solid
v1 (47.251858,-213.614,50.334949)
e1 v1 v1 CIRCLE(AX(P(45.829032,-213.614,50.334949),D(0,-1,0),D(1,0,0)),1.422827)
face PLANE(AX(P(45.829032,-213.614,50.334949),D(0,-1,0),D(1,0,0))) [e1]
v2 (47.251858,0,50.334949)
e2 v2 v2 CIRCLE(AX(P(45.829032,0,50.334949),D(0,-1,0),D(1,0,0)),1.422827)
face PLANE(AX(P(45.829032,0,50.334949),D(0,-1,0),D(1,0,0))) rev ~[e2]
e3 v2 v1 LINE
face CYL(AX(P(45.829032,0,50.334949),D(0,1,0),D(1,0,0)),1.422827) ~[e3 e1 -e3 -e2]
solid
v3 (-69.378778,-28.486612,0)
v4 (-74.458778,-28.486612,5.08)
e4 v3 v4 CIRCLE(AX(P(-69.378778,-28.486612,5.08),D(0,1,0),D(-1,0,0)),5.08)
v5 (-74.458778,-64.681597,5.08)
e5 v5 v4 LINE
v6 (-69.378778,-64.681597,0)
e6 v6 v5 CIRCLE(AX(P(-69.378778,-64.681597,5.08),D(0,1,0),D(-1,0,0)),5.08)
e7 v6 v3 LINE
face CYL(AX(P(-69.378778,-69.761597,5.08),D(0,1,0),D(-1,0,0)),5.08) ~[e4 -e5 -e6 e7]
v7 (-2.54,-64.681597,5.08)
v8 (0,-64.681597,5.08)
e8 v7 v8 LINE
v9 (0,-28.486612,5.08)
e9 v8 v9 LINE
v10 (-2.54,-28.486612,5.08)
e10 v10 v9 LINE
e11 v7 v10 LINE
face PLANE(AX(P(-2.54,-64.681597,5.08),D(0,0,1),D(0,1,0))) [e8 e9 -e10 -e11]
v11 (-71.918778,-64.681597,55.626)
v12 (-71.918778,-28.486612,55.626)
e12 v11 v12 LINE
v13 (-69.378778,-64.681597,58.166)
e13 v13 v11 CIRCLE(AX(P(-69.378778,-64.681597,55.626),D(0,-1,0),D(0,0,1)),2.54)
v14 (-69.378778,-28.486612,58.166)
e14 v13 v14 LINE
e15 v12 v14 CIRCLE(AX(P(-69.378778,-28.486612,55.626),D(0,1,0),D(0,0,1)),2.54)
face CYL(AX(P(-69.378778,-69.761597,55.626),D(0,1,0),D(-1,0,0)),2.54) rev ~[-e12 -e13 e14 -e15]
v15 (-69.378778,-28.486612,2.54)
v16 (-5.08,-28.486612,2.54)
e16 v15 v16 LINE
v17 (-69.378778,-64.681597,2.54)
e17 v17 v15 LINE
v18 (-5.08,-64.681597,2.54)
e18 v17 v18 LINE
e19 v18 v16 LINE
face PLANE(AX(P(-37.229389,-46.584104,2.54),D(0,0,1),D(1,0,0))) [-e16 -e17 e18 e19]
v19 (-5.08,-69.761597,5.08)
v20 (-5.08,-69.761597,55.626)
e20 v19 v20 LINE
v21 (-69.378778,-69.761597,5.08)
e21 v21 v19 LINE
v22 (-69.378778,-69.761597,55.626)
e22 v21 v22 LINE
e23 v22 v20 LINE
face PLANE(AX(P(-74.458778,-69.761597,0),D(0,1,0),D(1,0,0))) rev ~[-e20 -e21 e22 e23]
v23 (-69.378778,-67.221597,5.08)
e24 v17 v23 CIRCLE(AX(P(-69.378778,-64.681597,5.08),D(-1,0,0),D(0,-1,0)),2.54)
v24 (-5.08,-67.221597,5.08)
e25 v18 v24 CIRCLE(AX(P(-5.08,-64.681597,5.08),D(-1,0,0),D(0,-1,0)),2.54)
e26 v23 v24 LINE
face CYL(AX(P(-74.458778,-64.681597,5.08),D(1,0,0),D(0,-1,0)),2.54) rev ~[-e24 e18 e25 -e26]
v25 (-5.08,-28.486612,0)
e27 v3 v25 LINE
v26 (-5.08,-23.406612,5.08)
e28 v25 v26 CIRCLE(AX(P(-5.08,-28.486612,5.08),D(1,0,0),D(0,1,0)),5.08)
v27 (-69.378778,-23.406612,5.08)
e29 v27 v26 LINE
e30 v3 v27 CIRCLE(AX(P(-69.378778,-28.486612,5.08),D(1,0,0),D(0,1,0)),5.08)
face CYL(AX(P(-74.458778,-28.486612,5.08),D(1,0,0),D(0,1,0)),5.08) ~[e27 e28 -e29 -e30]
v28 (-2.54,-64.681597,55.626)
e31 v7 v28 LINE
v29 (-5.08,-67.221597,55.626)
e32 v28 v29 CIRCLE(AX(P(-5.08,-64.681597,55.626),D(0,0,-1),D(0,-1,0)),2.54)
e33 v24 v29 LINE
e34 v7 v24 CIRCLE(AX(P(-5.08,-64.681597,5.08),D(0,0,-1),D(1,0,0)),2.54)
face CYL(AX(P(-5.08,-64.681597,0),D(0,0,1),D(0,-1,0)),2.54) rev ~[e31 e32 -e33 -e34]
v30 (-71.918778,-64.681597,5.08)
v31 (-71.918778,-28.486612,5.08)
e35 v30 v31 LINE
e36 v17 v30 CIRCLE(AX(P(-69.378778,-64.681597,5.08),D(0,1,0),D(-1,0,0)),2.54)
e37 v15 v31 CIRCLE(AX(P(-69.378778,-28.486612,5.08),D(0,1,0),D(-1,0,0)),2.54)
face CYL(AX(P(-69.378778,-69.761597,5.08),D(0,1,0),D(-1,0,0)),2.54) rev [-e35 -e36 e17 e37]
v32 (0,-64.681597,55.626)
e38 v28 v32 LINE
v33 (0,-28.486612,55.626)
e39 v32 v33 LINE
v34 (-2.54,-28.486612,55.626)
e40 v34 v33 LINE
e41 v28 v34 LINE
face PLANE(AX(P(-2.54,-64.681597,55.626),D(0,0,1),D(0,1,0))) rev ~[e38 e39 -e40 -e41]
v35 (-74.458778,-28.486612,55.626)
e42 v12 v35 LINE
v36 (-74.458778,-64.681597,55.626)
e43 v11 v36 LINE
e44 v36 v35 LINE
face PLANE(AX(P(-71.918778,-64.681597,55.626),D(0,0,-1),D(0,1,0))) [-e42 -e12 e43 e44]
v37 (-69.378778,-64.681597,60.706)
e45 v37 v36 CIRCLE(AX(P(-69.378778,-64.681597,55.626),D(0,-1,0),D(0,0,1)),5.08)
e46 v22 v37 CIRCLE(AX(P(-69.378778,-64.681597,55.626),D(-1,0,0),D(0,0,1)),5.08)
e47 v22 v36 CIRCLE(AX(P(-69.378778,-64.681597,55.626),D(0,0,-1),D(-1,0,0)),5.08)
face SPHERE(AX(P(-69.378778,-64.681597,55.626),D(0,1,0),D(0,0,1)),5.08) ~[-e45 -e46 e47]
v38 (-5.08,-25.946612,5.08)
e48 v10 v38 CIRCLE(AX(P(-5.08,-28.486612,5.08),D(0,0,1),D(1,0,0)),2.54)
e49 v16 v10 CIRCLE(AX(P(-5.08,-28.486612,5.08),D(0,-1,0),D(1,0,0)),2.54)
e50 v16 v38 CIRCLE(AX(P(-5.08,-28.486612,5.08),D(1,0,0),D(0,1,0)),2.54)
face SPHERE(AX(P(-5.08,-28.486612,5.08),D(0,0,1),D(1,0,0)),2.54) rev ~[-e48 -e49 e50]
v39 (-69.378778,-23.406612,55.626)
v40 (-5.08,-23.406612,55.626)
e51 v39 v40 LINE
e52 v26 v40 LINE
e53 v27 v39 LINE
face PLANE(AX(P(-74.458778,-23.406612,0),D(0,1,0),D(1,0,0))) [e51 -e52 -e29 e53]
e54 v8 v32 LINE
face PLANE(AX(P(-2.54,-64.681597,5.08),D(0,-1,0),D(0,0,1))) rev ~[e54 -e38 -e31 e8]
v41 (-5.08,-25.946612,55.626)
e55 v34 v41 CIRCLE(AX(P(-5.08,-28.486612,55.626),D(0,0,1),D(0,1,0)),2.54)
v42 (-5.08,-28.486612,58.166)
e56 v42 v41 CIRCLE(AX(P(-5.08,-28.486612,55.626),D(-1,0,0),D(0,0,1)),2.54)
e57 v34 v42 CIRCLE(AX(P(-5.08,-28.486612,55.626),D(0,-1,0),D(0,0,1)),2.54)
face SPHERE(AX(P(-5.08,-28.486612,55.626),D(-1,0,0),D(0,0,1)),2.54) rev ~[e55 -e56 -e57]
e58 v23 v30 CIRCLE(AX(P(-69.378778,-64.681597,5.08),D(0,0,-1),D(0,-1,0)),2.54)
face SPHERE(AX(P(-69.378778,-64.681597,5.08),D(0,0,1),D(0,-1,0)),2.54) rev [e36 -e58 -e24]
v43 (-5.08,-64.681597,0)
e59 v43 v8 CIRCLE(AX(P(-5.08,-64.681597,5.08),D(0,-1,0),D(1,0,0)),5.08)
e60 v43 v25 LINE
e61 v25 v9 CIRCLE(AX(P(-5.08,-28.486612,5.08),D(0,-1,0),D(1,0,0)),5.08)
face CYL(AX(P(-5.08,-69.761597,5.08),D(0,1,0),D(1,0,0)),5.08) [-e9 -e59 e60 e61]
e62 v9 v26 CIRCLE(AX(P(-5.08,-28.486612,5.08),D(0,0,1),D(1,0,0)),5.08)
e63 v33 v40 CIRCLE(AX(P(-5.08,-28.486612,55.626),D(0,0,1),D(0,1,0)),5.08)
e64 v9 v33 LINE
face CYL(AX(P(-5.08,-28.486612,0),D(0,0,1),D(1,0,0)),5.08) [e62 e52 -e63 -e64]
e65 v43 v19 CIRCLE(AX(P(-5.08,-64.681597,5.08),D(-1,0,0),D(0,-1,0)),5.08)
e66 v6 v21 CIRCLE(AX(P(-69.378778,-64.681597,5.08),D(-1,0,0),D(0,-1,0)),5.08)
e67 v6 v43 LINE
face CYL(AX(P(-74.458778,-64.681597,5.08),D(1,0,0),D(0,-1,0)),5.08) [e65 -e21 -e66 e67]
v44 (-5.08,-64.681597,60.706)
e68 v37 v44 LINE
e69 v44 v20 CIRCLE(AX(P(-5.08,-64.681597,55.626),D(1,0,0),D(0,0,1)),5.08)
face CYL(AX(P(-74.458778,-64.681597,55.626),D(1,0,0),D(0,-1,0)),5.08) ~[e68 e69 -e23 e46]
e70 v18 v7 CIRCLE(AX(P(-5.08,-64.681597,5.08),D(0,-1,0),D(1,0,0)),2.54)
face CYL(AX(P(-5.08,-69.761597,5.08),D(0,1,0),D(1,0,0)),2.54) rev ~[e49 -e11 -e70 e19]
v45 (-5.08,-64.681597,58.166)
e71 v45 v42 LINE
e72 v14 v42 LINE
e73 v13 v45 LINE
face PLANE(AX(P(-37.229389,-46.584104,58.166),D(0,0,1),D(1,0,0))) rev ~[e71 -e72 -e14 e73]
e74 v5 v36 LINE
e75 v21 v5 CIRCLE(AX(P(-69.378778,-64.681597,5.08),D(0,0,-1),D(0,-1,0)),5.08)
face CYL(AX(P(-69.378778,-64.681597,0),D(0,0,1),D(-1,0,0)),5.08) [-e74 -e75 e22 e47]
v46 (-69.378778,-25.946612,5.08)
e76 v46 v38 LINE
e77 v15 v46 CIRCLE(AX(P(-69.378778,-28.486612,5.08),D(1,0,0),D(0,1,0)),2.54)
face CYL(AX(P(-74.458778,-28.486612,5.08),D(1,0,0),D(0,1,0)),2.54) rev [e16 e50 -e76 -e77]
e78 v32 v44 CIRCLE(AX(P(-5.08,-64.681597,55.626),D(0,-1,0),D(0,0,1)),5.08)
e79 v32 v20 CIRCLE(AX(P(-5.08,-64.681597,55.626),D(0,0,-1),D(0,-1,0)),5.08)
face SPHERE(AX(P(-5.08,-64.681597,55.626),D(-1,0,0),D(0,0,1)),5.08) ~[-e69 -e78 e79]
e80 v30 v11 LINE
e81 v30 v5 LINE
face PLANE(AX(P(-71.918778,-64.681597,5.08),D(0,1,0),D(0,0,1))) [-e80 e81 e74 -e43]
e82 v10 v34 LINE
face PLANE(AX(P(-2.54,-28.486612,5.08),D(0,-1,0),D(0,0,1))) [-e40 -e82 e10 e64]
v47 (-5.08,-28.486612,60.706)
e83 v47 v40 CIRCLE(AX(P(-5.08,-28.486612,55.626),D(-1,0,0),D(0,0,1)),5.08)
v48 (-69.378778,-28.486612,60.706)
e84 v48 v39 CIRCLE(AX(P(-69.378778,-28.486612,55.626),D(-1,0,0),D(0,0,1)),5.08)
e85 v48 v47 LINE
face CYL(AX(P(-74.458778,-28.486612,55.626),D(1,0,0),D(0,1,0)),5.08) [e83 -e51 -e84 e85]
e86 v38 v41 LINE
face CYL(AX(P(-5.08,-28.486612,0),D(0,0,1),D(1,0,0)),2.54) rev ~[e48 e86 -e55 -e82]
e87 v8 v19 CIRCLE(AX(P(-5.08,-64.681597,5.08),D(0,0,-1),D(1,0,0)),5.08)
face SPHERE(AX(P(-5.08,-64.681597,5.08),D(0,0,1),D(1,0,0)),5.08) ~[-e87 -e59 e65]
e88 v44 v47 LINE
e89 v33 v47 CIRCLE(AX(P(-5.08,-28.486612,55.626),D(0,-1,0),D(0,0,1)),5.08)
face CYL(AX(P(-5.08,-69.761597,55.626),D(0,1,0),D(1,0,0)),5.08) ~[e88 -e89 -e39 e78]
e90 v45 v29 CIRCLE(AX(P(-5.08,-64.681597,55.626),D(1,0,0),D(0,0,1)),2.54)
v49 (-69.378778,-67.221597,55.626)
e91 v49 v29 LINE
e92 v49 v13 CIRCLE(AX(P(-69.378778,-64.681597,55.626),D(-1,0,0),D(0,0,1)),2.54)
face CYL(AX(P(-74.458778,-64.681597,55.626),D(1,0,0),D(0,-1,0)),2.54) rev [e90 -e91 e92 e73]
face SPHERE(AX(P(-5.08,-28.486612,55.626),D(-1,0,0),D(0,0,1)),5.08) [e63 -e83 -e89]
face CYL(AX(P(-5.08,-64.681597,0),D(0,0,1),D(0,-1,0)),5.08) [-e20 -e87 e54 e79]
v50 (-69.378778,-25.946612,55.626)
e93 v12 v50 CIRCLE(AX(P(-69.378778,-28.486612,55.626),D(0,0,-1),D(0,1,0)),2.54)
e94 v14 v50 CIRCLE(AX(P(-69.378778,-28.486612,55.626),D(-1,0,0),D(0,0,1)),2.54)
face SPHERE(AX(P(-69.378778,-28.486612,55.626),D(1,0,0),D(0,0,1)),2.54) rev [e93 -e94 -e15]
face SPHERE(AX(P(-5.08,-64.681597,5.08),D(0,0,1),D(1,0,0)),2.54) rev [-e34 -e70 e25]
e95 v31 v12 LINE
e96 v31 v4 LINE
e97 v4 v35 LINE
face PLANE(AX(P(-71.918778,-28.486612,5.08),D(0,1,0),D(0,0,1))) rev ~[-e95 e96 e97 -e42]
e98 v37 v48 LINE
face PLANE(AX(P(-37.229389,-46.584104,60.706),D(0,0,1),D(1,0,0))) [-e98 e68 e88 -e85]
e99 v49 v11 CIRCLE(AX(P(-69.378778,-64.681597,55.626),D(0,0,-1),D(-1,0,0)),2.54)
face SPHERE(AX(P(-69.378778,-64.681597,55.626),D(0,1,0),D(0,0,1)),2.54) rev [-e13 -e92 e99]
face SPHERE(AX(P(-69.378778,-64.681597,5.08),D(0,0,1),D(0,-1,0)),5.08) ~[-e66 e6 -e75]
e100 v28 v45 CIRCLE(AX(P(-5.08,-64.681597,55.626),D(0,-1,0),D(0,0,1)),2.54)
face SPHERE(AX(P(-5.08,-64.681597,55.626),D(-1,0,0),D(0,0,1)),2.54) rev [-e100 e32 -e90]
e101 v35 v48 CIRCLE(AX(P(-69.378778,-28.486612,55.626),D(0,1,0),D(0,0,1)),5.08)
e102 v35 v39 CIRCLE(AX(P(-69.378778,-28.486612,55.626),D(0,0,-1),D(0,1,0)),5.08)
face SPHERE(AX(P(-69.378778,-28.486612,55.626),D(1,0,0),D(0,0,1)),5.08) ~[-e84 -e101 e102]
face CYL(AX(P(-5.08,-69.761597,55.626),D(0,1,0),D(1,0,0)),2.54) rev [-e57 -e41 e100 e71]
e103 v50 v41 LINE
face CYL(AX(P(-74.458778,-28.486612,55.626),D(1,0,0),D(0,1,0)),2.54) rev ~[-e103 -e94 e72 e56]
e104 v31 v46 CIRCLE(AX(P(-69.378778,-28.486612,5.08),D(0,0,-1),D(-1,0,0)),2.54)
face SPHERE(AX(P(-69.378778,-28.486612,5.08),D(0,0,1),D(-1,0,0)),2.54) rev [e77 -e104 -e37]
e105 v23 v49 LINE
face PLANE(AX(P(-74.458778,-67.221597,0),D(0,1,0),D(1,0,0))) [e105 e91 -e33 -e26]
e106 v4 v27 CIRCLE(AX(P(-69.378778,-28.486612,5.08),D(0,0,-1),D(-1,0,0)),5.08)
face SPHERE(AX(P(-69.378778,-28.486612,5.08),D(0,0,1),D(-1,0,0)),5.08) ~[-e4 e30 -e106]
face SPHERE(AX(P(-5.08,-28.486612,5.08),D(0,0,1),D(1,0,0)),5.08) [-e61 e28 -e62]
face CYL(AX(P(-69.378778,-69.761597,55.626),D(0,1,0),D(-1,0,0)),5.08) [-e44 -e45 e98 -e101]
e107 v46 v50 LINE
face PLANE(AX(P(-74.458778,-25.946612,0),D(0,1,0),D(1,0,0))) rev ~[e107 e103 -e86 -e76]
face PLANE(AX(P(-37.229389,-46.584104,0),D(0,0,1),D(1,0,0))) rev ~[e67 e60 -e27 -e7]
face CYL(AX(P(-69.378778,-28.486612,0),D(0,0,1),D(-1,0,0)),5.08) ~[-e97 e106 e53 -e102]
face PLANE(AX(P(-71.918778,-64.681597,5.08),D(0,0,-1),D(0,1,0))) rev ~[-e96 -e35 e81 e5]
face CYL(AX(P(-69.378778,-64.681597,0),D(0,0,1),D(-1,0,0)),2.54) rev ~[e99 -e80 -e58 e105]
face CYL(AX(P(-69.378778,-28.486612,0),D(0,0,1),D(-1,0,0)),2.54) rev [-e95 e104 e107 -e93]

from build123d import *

# Parameters (mm, degrees)
F0_W     = 74.4587779045
F0_H     = 46.3549848646
F1_DEPTH = 60.706
F2_R     = 5.08
F3_T     = -2.54
F4_R     = 1.4228267919
F5_DEPTH = 213.614


# Not quite as in the source:
# - a shell that OpenCascade refuses in one call is made with other operations: the cavity is built on its own and cut out


with BuildPart() as f1:
    # F0 (on Top) → F1 (new body)
    with BuildSketch(Plane.XY):
        with Locations((-37.2293889523, -46.5841041878)):
            Rectangle(F0_W, F0_H)
    extrude(amount=F1_DEPTH)

    # F2
    f2_edges = [f1.edges().sort_by_distance(p)[0] for p in [
        (-37.229389, -23.406612, 60.706),
        (-74.458778, -46.584104, 60.706),
        (-37.229389, -69.761597, 60.706),
        (0, -46.584104, 60.706),
        (0, -69.761597, 30.353),
        (0, -23.406612, 30.353),
        (0, -46.584104, 0),
        (-74.458778, -69.761597, 30.353),
        (-37.229389, -69.761597, 0),
        (-74.458778, -23.406612, 30.353),
        (-74.458778, -46.584104, 0),
        (-37.229389, -23.406612, 0),
    ]]
    fillet(f2_edges, radius=F2_R)

    # F3: a shell. OpenCascade refuses it in one call, so the cavity is built on its own and cut out:
    # the body offset inwards by the wall thickness, plus a prism from it out through each open face.
    f3_core = offset(f1.part, amount=F3_T, mode=Mode.PRIVATE)
    f3_exits = [f3_core.faces().sort_by_distance(p)[0] for p in [
        (-2.54, -46.584104, 30.353),
        (-71.918778, -46.584104, 30.353),
    ]]
    add(f3_core, mode=Mode.SUBTRACT)
    extrude(f3_exits, amount=-F3_T, mode=Mode.SUBTRACT)


with BuildPart() as f5:
    # F4 (on Front) → F5 (new body)
    with BuildSketch(Plane.XZ):
        with Locations((45.8290316164, 50.3349490464)):
            Circle(F4_R)
    extrude(amount=F5_DEPTH)


solid = Compound([f1.part, f5.part])
